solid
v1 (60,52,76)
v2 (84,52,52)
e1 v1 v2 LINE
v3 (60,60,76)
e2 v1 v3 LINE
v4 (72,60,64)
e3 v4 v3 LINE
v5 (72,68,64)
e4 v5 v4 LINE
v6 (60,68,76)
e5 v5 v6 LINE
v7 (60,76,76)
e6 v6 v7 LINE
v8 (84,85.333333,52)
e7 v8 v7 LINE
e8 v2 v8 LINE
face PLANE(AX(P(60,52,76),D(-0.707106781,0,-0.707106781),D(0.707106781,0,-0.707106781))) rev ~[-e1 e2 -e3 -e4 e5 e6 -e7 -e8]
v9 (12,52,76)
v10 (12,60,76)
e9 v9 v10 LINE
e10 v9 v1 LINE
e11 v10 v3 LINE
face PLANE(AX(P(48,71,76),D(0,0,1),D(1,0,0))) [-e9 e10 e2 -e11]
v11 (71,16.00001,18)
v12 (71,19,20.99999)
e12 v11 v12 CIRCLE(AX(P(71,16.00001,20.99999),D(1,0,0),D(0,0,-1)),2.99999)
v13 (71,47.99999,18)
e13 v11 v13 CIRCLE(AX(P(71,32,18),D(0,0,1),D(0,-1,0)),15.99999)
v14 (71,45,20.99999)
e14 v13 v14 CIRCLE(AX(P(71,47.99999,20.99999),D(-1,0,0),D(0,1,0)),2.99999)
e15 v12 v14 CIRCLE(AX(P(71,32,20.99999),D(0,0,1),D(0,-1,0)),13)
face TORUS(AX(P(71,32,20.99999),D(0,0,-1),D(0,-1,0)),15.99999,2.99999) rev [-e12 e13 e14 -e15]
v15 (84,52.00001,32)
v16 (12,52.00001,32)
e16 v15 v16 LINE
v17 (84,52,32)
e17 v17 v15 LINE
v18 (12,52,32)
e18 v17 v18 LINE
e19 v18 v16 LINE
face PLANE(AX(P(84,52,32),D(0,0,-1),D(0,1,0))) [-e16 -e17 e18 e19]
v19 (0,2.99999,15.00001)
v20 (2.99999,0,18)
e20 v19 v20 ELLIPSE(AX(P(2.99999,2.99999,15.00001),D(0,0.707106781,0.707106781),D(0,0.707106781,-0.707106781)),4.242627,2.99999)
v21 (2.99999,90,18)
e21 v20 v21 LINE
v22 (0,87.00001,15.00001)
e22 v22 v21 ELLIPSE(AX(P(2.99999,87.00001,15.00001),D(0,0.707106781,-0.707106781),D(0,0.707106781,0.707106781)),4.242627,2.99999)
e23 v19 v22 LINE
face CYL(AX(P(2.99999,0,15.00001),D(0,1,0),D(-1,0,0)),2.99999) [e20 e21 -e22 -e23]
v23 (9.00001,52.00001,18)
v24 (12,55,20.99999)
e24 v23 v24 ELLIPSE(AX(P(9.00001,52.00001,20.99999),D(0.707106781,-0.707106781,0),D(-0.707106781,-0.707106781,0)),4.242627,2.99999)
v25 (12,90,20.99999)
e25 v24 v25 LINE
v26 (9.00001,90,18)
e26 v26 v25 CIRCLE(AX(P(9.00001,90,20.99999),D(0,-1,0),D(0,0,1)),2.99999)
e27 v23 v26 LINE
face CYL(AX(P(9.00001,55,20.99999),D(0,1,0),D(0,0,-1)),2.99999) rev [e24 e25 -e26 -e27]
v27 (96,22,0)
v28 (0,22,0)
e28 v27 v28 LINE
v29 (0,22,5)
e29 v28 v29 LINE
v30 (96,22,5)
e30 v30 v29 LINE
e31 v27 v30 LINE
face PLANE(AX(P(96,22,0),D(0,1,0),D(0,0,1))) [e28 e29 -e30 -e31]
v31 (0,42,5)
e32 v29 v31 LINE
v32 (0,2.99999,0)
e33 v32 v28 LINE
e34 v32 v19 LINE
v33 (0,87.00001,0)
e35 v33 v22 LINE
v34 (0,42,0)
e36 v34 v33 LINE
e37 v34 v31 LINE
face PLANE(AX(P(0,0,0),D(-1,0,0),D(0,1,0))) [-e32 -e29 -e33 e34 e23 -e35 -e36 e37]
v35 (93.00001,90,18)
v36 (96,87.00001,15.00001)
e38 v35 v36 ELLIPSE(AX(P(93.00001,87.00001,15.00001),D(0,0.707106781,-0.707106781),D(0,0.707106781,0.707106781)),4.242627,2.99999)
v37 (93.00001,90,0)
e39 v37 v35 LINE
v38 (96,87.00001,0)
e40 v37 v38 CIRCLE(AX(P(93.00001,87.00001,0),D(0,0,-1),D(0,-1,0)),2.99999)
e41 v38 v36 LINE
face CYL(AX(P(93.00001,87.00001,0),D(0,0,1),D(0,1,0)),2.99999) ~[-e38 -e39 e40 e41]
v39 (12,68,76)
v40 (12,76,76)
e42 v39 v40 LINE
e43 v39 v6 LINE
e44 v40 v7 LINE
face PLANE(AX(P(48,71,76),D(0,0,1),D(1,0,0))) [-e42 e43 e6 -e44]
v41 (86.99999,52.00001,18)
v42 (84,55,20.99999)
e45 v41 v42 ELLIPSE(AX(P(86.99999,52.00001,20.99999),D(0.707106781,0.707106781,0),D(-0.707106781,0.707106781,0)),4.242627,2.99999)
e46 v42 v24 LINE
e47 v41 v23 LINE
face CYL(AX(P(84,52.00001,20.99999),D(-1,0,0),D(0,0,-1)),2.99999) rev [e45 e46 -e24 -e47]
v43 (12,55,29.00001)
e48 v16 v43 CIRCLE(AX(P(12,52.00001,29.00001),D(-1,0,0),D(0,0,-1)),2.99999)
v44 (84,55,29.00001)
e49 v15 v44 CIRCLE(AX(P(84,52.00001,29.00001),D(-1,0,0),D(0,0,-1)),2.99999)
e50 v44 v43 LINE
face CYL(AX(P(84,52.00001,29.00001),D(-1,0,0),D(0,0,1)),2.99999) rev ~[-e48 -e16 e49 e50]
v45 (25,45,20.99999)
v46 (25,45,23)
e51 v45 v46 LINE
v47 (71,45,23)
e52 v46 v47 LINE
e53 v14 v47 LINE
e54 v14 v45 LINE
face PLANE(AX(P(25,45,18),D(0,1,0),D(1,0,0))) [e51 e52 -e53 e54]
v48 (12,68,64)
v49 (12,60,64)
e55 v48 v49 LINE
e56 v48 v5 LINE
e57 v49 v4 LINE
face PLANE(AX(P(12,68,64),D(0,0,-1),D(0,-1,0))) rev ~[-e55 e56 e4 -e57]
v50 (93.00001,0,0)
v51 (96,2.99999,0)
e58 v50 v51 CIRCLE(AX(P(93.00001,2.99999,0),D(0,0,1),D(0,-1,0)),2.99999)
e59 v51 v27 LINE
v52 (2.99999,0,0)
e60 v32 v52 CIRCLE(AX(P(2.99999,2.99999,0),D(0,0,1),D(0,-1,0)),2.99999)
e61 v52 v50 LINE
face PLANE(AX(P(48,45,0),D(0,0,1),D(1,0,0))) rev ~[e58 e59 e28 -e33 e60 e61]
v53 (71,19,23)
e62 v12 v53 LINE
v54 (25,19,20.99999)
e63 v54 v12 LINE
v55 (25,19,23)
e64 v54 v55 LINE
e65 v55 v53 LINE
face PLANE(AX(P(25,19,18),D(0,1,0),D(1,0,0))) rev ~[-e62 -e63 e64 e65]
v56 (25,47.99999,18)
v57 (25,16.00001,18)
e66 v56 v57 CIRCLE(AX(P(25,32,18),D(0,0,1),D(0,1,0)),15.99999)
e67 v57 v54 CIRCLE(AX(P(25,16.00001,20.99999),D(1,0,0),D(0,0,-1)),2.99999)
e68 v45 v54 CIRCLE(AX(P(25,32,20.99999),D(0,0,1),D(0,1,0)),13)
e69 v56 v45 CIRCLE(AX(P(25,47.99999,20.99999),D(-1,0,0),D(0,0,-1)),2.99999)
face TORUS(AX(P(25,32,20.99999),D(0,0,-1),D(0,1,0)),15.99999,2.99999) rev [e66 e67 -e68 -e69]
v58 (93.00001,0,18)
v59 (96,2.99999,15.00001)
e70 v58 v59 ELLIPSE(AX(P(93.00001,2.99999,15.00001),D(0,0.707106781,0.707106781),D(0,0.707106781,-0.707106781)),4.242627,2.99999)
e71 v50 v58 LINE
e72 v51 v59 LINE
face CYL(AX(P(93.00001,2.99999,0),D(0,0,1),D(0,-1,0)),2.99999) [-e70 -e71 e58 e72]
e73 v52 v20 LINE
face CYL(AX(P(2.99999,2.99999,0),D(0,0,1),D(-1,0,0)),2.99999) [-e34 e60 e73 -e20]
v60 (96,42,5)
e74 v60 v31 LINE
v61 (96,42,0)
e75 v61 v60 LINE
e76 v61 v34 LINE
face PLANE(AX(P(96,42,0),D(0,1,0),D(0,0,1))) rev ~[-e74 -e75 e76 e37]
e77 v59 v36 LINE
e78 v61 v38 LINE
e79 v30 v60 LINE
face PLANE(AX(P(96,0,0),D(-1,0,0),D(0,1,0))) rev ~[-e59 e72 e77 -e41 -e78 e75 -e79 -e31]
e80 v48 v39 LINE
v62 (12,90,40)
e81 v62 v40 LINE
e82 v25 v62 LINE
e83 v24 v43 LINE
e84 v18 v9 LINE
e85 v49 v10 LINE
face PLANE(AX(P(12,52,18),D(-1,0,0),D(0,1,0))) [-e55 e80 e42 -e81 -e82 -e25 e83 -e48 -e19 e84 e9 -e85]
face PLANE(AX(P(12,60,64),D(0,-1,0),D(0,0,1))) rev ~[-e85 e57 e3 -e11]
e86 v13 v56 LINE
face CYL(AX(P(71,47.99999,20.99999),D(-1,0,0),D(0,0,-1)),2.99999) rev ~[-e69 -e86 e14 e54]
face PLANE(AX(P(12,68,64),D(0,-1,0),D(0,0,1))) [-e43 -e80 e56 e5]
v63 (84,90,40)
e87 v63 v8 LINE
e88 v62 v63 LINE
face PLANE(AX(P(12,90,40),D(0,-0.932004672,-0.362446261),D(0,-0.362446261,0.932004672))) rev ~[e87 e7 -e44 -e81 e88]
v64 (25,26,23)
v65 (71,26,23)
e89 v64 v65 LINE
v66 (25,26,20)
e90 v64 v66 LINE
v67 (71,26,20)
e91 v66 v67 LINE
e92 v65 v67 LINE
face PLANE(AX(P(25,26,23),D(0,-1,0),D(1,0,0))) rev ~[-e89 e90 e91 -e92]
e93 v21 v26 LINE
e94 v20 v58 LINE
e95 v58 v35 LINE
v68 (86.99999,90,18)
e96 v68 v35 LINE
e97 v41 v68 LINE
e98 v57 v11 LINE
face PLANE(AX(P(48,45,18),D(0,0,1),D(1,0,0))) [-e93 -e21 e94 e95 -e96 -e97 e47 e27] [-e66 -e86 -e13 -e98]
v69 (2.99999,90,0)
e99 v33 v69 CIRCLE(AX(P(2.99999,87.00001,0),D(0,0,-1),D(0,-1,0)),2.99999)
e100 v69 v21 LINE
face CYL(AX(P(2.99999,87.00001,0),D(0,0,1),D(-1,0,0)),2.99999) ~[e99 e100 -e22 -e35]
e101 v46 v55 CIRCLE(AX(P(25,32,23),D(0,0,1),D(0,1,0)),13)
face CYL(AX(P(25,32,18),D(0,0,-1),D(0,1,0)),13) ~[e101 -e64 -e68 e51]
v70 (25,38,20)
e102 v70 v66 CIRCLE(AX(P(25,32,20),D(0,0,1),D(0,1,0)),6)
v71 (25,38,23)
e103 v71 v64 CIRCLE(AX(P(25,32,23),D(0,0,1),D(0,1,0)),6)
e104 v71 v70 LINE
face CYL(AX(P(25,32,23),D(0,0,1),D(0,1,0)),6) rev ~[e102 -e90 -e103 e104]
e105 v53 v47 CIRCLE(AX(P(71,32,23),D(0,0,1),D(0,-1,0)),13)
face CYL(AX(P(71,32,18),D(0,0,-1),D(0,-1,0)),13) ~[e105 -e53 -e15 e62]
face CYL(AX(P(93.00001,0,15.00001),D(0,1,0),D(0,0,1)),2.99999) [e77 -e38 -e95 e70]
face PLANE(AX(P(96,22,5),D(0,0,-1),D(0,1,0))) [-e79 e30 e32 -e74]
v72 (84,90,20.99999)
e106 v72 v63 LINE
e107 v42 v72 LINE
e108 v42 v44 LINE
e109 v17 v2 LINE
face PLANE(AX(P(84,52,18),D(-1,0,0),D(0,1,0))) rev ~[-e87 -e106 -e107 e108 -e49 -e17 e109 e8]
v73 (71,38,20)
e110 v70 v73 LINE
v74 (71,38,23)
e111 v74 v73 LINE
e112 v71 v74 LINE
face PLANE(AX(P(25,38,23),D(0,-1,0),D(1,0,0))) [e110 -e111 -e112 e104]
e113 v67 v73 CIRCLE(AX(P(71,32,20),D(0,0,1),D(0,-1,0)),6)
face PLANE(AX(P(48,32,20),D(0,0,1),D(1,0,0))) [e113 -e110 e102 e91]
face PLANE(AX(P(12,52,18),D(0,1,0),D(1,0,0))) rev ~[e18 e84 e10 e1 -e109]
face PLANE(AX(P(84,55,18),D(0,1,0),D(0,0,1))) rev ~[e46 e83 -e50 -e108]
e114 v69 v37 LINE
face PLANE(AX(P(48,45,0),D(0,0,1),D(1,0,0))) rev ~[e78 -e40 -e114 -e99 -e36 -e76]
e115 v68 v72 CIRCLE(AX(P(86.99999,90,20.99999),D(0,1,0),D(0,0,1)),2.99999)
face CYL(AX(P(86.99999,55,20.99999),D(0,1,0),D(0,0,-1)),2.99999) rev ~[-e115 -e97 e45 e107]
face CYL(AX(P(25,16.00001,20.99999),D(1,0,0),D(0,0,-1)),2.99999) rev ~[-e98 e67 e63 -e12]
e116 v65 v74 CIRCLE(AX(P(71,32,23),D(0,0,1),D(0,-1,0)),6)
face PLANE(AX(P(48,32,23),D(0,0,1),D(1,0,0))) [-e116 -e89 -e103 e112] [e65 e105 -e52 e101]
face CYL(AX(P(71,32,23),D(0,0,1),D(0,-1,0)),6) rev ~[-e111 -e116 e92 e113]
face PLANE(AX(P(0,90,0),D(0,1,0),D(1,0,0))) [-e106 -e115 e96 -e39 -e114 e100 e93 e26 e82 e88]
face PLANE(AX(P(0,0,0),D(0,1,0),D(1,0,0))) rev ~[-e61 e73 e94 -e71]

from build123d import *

# Parameters (mm, degrees)
F0_W      = 96
F0_H      = 90
F1_DEPTH  = 18
F2_W      = 72
F2_H      = 38
F4_DEPTH  = 58
F6_DEPTH  = 38
F7_W      = 8
F7_H      = 12
F8_DEPTH  = 60.001
F10_DEPTH = 72.001
F11_W     = 20
F11_H     = 5
F12_DEPTH = 96
F13_W     = 46
F13_H     = 26
F14_DEPTH = 5
F15_W     = 46
F15_H     = 12
F17_DEPTH = 3
F18_W     = 3
F18_H     = 14
F19_DEPTH = 72
F20_R     = 2.99999


# Not quite as in the source:
# - a fillet or chamfer is up to 0.001 mm smaller than in the source, because OpenCascade refuses the exact size


with BuildPart() as f1:
    # F0 (on Top) → F1 (new body)
    with BuildSketch(Plane.XY):
        with Locations((48, 45)):
            Rectangle(F0_W, F0_H)
    extrude(amount=F1_DEPTH)

    # F2 (on face) → F4 (join, through all)
    with BuildSketch(Plane.XY.offset(18)):
        with Locations((48, 71)):
            Rectangle(F2_W, F2_H)
    extrude(amount=F4_DEPTH)

    # F5 (on face) → F6 (cut, through all)
    with BuildSketch(Plane.XZ.offset(-52)):
        Polygon((84, 52), (84, 76), (60, 76), align=None)
    extrude(amount=-F6_DEPTH, mode=Mode.SUBTRACT)

    # F7 (on face) → F8 (cut, through all)
    with BuildSketch(Plane(origin=(12, 0, 0), x_dir=(0, -1, 0), z_dir=(-1, 0, 0))):
        with Locations((-64, 70)):
            Rectangle(F7_W, F7_H)
    extrude(amount=-F8_DEPTH, mode=Mode.SUBTRACT)

    # F9 (on face) → F10 (cut, through all)
    with BuildSketch(Plane(origin=(12, 0, 0), x_dir=(0, -1, 0), z_dir=(-1, 0, 0))):
        Polygon((-90, 40), (-76, 76), (-90, 76), align=None)
    extrude(amount=-F10_DEPTH, mode=Mode.SUBTRACT)

    # F11 (on face) → F12 (cut, through all)
    with BuildSketch(Plane.YZ.offset(96)):
        with Locations((32, 2.5)):
            Rectangle(F11_W, F11_H)
    extrude(amount=-F12_DEPTH, mode=Mode.SUBTRACT)

    # F13 (on face) → F14 (join)
    with BuildSketch(Plane.XY.offset(18)):
        with Locations((48, 31.9999999999)):
            Rectangle(F13_W, F13_H)
        with BuildLine():
            Line((25, 18.9999999999), (25, 44.9999999999))
            ThreePointArc((25, 44.9999999999), (12, 31.9999999999), (25, 18.9999999999))
        make_face()
        with BuildLine():
            ThreePointArc((71, 18.9999999999), (84, 31.9999999999), (71, 44.9999999999))
            Line((71, 44.9999999999), (71, 18.9999999999))
        make_face()
    extrude(amount=F14_DEPTH)

    # F15 (on face) → F17 (cut, through all)
    with BuildSketch(Plane.XY.offset(23)):
        with Locations((48, 31.9999999999)):
            Rectangle(F15_W, F15_H)
        with BuildLine():
            Line((25, 25.9999999999), (25, 37.9999999999))
            ThreePointArc((25, 37.9999999999), (19, 31.9999999999), (25, 25.9999999999))
        make_face()
        with BuildLine():
            ThreePointArc((71, 25.9999999999), (77, 31.9999999999), (71, 37.9999999999))
            Line((71, 37.9999999999), (71, 25.9999999999))
        make_face()
    extrude(amount=-F17_DEPTH, mode=Mode.SUBTRACT)

    # F18 (on face) → F19 (cut, through all)
    with BuildSketch(Plane.YZ.offset(84)):
        with Locations((53.5, 25)):
            Rectangle(F18_W, F18_H)
    extrude(amount=-F19_DEPTH, mode=Mode.SUBTRACT)

    # F20 (radius 3 in the source; OpenCascade refuses exactly that, so slightly less here)
    f20_edges = [f1.edges().sort_by_distance(p)[0] for p in [
        (48, 19, 18),
        (48, 55, 18),
        (48, 55, 32),
        (84, 72.5, 18),
        (12, 72.5, 18),
        (0, 45, 18),
        (96, 45, 18),
        (96, 0, 9),
        (0, 0, 9),
        (0, 90, 9),
        (96, 90, 9),
    ]]
    fillet(f20_edges, radius=F20_R)


solid = f1.part
